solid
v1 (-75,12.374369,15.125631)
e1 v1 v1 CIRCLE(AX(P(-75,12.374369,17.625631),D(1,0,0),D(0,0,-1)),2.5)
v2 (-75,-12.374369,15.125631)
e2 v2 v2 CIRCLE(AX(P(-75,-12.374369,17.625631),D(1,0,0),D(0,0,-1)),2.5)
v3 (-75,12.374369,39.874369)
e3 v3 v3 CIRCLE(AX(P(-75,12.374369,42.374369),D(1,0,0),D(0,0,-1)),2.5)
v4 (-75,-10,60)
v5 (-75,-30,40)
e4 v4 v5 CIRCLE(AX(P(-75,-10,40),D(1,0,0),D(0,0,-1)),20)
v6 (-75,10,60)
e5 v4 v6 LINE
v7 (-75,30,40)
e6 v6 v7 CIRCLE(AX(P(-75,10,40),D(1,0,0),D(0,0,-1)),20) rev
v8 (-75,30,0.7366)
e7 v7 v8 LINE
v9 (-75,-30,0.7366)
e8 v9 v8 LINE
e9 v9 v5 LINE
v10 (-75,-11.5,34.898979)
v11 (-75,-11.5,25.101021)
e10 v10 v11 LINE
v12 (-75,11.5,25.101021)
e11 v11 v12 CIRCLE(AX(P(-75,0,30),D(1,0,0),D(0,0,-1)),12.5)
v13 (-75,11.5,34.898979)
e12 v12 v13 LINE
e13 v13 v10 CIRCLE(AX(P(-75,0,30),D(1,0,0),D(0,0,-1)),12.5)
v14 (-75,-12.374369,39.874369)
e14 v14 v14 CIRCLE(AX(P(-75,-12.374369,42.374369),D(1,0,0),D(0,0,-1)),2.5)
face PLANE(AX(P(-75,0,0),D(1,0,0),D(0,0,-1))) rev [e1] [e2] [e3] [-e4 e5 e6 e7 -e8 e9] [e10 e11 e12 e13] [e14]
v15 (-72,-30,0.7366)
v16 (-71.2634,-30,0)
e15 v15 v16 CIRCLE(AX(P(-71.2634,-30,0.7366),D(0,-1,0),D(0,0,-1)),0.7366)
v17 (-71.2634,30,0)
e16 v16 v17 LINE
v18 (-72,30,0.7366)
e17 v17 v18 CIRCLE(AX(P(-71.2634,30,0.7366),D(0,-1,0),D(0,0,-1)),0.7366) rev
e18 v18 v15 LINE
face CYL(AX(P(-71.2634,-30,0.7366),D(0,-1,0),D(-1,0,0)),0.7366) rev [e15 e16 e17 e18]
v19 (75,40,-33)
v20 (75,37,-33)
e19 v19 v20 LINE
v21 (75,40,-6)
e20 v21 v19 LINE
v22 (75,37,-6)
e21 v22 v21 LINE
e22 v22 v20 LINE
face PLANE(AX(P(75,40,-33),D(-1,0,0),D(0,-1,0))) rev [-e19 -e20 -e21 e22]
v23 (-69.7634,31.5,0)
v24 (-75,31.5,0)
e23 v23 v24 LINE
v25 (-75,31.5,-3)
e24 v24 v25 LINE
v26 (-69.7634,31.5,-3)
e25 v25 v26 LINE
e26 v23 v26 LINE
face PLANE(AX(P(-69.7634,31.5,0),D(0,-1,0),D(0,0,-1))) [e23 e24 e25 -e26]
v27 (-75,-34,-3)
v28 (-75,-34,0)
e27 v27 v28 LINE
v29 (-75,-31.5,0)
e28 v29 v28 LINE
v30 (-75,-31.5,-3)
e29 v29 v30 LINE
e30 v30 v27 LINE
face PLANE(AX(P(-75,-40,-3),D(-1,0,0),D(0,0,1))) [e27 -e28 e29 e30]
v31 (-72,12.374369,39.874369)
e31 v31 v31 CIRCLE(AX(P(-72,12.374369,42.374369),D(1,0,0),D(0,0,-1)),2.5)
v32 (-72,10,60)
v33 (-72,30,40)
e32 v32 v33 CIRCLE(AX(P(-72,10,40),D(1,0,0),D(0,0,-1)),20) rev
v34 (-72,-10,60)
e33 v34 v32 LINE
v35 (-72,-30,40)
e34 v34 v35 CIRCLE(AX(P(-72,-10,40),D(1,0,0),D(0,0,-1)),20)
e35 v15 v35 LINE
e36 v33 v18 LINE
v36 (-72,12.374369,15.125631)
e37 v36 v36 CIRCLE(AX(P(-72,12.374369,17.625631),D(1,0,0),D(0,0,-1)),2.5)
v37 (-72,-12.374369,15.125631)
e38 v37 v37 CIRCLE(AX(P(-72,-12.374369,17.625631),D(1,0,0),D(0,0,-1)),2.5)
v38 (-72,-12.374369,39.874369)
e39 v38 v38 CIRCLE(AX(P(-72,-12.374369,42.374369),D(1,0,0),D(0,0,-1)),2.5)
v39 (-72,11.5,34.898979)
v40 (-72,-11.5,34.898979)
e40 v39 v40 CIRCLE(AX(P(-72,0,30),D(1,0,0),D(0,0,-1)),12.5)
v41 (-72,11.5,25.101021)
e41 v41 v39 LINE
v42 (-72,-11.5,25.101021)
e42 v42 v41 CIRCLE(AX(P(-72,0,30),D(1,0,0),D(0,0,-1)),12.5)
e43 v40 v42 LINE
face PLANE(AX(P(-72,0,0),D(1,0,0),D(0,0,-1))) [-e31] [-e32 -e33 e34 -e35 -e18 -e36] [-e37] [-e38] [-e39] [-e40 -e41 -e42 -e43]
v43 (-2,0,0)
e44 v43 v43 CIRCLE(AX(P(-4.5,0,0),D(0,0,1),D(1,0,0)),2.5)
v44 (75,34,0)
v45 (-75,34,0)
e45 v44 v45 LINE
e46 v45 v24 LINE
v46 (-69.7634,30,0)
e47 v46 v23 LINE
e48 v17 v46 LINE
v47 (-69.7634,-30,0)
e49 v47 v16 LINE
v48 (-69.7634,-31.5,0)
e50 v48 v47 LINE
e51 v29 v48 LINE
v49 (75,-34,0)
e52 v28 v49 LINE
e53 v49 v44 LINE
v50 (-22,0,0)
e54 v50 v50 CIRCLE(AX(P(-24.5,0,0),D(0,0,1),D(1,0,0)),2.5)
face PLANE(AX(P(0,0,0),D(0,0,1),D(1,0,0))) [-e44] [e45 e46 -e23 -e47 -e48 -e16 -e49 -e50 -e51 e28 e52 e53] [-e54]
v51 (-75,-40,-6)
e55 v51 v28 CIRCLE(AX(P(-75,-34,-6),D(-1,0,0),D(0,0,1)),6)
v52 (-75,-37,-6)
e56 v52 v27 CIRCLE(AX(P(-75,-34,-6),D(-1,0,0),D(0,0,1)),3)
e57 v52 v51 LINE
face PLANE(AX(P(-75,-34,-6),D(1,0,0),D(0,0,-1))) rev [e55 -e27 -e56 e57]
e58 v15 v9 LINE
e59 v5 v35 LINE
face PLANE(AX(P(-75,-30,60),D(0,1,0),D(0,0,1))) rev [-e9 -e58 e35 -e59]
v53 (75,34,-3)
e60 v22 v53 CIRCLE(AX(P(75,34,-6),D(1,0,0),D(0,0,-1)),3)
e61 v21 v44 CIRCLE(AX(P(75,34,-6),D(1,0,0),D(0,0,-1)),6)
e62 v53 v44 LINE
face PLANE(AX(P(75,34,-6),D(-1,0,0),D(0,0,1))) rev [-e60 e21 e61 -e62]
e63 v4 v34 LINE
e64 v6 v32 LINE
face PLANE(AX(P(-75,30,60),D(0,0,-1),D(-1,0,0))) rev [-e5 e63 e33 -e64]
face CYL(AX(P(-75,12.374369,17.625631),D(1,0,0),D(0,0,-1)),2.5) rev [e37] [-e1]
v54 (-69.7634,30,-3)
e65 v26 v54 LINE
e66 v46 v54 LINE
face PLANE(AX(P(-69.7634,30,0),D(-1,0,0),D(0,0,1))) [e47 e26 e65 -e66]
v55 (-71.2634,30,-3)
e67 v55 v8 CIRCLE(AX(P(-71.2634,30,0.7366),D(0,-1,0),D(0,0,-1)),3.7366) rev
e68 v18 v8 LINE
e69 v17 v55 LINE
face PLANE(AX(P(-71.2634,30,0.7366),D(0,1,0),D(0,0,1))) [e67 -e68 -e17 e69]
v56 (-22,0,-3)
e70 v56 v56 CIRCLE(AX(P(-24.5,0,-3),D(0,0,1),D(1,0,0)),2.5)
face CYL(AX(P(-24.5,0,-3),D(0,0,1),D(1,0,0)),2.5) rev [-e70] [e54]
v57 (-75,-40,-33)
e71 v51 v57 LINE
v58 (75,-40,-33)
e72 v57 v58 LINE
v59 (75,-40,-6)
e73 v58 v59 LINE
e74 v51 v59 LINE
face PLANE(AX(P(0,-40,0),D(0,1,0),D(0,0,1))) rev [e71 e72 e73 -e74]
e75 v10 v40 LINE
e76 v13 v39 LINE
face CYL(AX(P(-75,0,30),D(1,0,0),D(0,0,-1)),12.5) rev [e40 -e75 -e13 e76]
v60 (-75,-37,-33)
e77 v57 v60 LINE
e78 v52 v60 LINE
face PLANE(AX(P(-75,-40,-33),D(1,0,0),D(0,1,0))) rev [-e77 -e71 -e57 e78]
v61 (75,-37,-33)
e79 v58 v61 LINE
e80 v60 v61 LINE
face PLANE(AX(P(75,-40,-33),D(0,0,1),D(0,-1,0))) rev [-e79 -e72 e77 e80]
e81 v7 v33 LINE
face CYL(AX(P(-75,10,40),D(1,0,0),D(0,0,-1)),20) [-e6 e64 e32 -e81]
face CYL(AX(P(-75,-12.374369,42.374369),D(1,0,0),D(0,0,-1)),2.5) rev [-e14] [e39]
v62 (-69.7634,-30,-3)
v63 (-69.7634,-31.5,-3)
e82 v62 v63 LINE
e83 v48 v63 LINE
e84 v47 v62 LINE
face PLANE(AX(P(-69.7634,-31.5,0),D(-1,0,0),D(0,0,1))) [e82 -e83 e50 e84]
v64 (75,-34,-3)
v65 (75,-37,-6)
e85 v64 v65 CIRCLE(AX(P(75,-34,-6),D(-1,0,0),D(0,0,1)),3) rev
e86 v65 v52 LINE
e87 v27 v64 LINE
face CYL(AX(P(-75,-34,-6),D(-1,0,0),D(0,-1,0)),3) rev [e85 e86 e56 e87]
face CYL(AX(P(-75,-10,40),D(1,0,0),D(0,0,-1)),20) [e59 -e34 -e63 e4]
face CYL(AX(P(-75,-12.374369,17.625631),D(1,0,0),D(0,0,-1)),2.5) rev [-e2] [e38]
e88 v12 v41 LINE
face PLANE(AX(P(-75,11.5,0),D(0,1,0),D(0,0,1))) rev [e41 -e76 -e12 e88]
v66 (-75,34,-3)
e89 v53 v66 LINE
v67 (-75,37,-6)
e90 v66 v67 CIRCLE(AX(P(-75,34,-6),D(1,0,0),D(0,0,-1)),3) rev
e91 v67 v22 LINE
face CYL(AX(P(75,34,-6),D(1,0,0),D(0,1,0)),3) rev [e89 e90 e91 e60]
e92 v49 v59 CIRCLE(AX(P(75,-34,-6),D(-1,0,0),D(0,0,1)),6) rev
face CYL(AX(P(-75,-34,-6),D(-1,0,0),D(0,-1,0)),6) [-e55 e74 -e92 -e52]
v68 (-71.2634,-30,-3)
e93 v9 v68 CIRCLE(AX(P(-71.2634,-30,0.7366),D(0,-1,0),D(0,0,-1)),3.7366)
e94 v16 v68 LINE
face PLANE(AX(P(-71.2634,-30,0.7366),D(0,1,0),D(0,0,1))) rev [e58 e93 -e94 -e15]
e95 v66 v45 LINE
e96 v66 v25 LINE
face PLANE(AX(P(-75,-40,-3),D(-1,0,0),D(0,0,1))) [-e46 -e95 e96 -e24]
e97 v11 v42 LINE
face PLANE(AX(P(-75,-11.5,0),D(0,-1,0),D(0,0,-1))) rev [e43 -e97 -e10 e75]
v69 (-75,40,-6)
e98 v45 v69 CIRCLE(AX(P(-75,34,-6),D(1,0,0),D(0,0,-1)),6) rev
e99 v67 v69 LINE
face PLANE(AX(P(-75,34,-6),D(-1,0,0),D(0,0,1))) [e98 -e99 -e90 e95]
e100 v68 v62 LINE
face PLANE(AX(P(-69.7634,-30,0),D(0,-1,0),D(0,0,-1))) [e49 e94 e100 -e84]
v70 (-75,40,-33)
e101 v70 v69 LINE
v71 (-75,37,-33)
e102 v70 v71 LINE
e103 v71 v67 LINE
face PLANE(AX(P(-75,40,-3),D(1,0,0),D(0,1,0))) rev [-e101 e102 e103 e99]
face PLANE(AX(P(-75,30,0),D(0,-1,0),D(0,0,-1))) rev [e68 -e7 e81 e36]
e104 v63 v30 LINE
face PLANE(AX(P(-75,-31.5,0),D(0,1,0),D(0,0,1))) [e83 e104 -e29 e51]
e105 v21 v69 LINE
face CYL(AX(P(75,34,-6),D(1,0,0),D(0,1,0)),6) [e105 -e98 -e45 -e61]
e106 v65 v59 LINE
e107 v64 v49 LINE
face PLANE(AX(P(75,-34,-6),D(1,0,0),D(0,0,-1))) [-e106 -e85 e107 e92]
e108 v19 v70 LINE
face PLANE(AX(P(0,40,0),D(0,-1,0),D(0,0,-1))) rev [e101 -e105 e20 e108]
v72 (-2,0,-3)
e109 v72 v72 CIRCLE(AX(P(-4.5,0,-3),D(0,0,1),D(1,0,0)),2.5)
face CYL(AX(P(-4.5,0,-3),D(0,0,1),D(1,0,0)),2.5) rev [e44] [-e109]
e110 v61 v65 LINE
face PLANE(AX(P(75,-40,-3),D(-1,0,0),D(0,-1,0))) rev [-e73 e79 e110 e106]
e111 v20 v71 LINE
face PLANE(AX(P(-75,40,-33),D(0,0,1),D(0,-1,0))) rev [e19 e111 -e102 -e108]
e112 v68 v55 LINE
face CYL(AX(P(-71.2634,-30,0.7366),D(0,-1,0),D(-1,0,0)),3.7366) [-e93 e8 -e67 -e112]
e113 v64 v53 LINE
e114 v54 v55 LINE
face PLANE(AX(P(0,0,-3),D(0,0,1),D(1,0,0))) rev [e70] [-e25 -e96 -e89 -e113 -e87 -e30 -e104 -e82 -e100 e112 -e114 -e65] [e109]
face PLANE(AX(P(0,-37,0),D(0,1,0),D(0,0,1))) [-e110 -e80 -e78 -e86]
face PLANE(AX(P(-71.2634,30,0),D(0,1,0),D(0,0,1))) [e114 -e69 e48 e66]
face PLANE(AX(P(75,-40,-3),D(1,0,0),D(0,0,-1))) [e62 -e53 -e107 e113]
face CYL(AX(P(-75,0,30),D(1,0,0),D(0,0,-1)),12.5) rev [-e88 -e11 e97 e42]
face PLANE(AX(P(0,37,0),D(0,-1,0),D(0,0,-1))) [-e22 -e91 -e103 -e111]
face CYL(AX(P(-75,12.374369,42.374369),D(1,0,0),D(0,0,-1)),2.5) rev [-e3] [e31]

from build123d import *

# Parameters (mm, degrees)
SCHIZZO1_W                       = 150
SCHIZZO1_H                       = 80
BASE_FLANGIA1_DEPTH              = 3
BORDO_FLANGIA1_STRIP_W           = 18
BORDO_FLANGIA1_STRIP_H           = 3
BORDO_FLANGIA1_STRIP_CUT_DEPTH   = 150
BORDO_FLANGIA1_STRIP_2_W         = 18
BORDO_FLANGIA1_STRIP_2_H         = 3
BORDO_FLANGIA1_STRIP_CUT_2_DEPTH = 150
BORDO_FLANGIA1_DEPTH             = 150
BORDO_FLANGIA1_BEND_DEPTH        = 150
BORDO_FLANGIA3_STRIP_W           = 13.4732
BORDO_FLANGIA3_STRIP_H           = 3
BORDO_FLANGIA3_STRIP_CUT_DEPTH   = 60
BORDO_FLANGIA3_RELIEF_W          = 14.9732
BORDO_FLANGIA3_RELIEF_H          = 1.5
BORDO_FLANGIA3_RELIEF_CUT_DEPTH  = 3
BORDO_FLANGIA3_DEPTH             = 60
SCHIZZO28_R                      = 2.5
TAGLIO_ESTRUSIONE1_DEPTH         = 3
SCHIZZO30_R                      = 2.5
TAGLIO_ESTRUSIONE2_DEPTH         = 3


# Sheet-metal steps are written as plain solids
with BuildPart() as part:
    # Schizzo1 → Base-Flangia1 (new body)
    with BuildSketch(Plane.XY):
        Rectangle(SCHIZZO1_W, SCHIZZO1_H)
    extrude(amount=-BASE_FLANGIA1_DEPTH)

    # Bordo-Flangia1 strip (across the edge) → Bordo-Flangia1 strip cut (cut)
    with BuildSketch(Plane(origin=(-75, 40, -3), x_dir=(0, -1, 0), z_dir=(1, 0, 0))):
        with Locations((-3, -1.5)):
            Rectangle(BORDO_FLANGIA1_STRIP_W, BORDO_FLANGIA1_STRIP_H)
    extrude(amount=BORDO_FLANGIA1_STRIP_CUT_DEPTH, mode=Mode.SUBTRACT)

    # Bordo-Flangia1 strip 2 (across the edge) → Bordo-Flangia1 strip cut 2 (cut)
    with BuildSketch(Plane(origin=(75, -40, -3), x_dir=(0, 1, 0), z_dir=(-1, 0, 0))):
        with Locations((-3, -1.5)):
            Rectangle(BORDO_FLANGIA1_STRIP_2_W, BORDO_FLANGIA1_STRIP_2_H)
    extrude(amount=BORDO_FLANGIA1_STRIP_CUT_2_DEPTH, mode=Mode.SUBTRACT)

    # Bordo-Flangia1 section (across the edge) → Bordo-Flangia1 (add)
    with BuildSketch(Plane(origin=(-75, 40, -3), x_dir=(0, -1, 0), z_dir=(1, 0, 0))):
        with BuildLine():
            Line((0, 3), (0, 30))
            Line((0, 30), (3, 30))
            Line((3, 30), (3, 3))
            ThreePointArc((3, 3), (3.878679656, 0.878679656), (6, 0))
            Line((6, 0), (6, -3))
            ThreePointArc((6, -3), (1.757359313, -1.242640687), (0, 3))
        make_face()
    extrude(amount=BORDO_FLANGIA1_DEPTH)

    # Bordo-Flangia1 section 2 (across the edge) → Bordo-Flangia1 bend (add)
    with BuildSketch(Plane(origin=(75, -40, -3), x_dir=(0, 1, 0), z_dir=(-1, 0, 0))):
        with BuildLine():
            Line((0, 3), (0, 30))
            Line((0, 30), (3, 30))
            Line((3, 30), (3, 3))
            ThreePointArc((3, 3), (3.878679656, 0.878679656), (6, 0))
            Line((6, 0), (6, -3))
            ThreePointArc((6, -3), (1.757359313, -1.242640687), (0, 3))
        make_face()
    extrude(amount=BORDO_FLANGIA1_BEND_DEPTH)

    # Bordo-Flangia3 strip (across the edge) → Bordo-Flangia3 strip cut (cut)
    with BuildSketch(Plane(origin=(-75, 30, 0), x_dir=(1, 0, 0), z_dir=(0, -1, 0))):
        with Locations((-3, -1.5)):
            Rectangle(BORDO_FLANGIA3_STRIP_W, BORDO_FLANGIA3_STRIP_H)
    extrude(amount=BORDO_FLANGIA3_STRIP_CUT_DEPTH, mode=Mode.SUBTRACT)

    # Bordo-Flangia3 relief (on the sheet) → Bordo-Flangia3 relief cut (cut)
    with BuildSketch(Plane(origin=(-71.2634, 30, 0), x_dir=(1, 0, 0), z_dir=(0, 0, 1))):
        with Locations((-5.9866, 0.75)):
            Rectangle(BORDO_FLANGIA3_RELIEF_W, BORDO_FLANGIA3_RELIEF_H)
        with Locations((-5.9866, -60.75)):
            Rectangle(BORDO_FLANGIA3_RELIEF_W, BORDO_FLANGIA3_RELIEF_H)
    extrude(amount=-BORDO_FLANGIA3_RELIEF_CUT_DEPTH, mode=Mode.SUBTRACT)

    # Bordo-Flangia3 section (across the edge) → Bordo-Flangia3 (add)
    with BuildSketch(Plane(origin=(-75, 30, 0), x_dir=(1, 0, 0), z_dir=(0, -1, 0))):
        with BuildLine():
            Line((0, 0.7366), (0, 60))
            Line((0, 60), (3, 60))
            Line((3, 60), (3, 0.7366))
            ThreePointArc((3, 0.7366), (3.215745145, 0.215745145), (3.7366, 0))
            Line((3.7366, 0), (3.7366, -3))
            ThreePointArc((3.7366, -3), (1.094424801, -1.905575199), (0, 0.7366))
        make_face()
    extrude(amount=BORDO_FLANGIA3_DEPTH)

    # Schizzo28 → Taglio-Estrusione1 (cut)
    with BuildSketch(Plane(origin=(-72, 0, 0), x_dir=(0, 0, -1), z_dir=(1, 0, 0))):
        with BuildLine():
            Line((-60, 30), (-60, 10))
            ThreePointArc((-60, 10), (-54.142135624, 24.142135624), (-40, 30))
            Line((-40, 30), (-60, 30))
        make_face()
        with BuildLine():
            ThreePointArc((-40, -30), (-54.142135624, -24.142135624), (-60, -10))
            Line((-60, -10), (-60, -30))
            Line((-60, -30), (-40, -30))
        make_face()
        with BuildLine():
            Line((-34.898979486, -11.5), (-25.101020514, -11.5))
            ThreePointArc((-25.101020514, -11.5), (-17.5, 0), (-25.101020514, 11.5))
            Line((-25.101020514, 11.5), (-34.898979486, 11.5))
            ThreePointArc((-34.898979486, 11.5), (-42.5, 0), (-34.898979486, -11.5))
        make_face()
        with Locations((-42.374368671, 12.374368671)):
            Circle(SCHIZZO28_R)
        with Locations((-17.625631329, 12.374368671)):
            Circle(SCHIZZO28_R)
        with Locations((-17.625631329, -12.374368671)):
            Circle(SCHIZZO28_R)
        with Locations((-42.374368671, -12.374368671)):
            Circle(SCHIZZO28_R)
    extrude(amount=-TAGLIO_ESTRUSIONE1_DEPTH, mode=Mode.SUBTRACT)

    # Schizzo30 → Taglio-Estrusione2 (cut)
    with BuildSketch(Plane.XY):
        with Locations((-24.5, 0)):
            Circle(SCHIZZO30_R)
        with Locations((-4.5, 0)):
            Circle(SCHIZZO30_R)
    extrude(amount=-TAGLIO_ESTRUSIONE2_DEPTH, mode=Mode.SUBTRACT)


solid = part.part
